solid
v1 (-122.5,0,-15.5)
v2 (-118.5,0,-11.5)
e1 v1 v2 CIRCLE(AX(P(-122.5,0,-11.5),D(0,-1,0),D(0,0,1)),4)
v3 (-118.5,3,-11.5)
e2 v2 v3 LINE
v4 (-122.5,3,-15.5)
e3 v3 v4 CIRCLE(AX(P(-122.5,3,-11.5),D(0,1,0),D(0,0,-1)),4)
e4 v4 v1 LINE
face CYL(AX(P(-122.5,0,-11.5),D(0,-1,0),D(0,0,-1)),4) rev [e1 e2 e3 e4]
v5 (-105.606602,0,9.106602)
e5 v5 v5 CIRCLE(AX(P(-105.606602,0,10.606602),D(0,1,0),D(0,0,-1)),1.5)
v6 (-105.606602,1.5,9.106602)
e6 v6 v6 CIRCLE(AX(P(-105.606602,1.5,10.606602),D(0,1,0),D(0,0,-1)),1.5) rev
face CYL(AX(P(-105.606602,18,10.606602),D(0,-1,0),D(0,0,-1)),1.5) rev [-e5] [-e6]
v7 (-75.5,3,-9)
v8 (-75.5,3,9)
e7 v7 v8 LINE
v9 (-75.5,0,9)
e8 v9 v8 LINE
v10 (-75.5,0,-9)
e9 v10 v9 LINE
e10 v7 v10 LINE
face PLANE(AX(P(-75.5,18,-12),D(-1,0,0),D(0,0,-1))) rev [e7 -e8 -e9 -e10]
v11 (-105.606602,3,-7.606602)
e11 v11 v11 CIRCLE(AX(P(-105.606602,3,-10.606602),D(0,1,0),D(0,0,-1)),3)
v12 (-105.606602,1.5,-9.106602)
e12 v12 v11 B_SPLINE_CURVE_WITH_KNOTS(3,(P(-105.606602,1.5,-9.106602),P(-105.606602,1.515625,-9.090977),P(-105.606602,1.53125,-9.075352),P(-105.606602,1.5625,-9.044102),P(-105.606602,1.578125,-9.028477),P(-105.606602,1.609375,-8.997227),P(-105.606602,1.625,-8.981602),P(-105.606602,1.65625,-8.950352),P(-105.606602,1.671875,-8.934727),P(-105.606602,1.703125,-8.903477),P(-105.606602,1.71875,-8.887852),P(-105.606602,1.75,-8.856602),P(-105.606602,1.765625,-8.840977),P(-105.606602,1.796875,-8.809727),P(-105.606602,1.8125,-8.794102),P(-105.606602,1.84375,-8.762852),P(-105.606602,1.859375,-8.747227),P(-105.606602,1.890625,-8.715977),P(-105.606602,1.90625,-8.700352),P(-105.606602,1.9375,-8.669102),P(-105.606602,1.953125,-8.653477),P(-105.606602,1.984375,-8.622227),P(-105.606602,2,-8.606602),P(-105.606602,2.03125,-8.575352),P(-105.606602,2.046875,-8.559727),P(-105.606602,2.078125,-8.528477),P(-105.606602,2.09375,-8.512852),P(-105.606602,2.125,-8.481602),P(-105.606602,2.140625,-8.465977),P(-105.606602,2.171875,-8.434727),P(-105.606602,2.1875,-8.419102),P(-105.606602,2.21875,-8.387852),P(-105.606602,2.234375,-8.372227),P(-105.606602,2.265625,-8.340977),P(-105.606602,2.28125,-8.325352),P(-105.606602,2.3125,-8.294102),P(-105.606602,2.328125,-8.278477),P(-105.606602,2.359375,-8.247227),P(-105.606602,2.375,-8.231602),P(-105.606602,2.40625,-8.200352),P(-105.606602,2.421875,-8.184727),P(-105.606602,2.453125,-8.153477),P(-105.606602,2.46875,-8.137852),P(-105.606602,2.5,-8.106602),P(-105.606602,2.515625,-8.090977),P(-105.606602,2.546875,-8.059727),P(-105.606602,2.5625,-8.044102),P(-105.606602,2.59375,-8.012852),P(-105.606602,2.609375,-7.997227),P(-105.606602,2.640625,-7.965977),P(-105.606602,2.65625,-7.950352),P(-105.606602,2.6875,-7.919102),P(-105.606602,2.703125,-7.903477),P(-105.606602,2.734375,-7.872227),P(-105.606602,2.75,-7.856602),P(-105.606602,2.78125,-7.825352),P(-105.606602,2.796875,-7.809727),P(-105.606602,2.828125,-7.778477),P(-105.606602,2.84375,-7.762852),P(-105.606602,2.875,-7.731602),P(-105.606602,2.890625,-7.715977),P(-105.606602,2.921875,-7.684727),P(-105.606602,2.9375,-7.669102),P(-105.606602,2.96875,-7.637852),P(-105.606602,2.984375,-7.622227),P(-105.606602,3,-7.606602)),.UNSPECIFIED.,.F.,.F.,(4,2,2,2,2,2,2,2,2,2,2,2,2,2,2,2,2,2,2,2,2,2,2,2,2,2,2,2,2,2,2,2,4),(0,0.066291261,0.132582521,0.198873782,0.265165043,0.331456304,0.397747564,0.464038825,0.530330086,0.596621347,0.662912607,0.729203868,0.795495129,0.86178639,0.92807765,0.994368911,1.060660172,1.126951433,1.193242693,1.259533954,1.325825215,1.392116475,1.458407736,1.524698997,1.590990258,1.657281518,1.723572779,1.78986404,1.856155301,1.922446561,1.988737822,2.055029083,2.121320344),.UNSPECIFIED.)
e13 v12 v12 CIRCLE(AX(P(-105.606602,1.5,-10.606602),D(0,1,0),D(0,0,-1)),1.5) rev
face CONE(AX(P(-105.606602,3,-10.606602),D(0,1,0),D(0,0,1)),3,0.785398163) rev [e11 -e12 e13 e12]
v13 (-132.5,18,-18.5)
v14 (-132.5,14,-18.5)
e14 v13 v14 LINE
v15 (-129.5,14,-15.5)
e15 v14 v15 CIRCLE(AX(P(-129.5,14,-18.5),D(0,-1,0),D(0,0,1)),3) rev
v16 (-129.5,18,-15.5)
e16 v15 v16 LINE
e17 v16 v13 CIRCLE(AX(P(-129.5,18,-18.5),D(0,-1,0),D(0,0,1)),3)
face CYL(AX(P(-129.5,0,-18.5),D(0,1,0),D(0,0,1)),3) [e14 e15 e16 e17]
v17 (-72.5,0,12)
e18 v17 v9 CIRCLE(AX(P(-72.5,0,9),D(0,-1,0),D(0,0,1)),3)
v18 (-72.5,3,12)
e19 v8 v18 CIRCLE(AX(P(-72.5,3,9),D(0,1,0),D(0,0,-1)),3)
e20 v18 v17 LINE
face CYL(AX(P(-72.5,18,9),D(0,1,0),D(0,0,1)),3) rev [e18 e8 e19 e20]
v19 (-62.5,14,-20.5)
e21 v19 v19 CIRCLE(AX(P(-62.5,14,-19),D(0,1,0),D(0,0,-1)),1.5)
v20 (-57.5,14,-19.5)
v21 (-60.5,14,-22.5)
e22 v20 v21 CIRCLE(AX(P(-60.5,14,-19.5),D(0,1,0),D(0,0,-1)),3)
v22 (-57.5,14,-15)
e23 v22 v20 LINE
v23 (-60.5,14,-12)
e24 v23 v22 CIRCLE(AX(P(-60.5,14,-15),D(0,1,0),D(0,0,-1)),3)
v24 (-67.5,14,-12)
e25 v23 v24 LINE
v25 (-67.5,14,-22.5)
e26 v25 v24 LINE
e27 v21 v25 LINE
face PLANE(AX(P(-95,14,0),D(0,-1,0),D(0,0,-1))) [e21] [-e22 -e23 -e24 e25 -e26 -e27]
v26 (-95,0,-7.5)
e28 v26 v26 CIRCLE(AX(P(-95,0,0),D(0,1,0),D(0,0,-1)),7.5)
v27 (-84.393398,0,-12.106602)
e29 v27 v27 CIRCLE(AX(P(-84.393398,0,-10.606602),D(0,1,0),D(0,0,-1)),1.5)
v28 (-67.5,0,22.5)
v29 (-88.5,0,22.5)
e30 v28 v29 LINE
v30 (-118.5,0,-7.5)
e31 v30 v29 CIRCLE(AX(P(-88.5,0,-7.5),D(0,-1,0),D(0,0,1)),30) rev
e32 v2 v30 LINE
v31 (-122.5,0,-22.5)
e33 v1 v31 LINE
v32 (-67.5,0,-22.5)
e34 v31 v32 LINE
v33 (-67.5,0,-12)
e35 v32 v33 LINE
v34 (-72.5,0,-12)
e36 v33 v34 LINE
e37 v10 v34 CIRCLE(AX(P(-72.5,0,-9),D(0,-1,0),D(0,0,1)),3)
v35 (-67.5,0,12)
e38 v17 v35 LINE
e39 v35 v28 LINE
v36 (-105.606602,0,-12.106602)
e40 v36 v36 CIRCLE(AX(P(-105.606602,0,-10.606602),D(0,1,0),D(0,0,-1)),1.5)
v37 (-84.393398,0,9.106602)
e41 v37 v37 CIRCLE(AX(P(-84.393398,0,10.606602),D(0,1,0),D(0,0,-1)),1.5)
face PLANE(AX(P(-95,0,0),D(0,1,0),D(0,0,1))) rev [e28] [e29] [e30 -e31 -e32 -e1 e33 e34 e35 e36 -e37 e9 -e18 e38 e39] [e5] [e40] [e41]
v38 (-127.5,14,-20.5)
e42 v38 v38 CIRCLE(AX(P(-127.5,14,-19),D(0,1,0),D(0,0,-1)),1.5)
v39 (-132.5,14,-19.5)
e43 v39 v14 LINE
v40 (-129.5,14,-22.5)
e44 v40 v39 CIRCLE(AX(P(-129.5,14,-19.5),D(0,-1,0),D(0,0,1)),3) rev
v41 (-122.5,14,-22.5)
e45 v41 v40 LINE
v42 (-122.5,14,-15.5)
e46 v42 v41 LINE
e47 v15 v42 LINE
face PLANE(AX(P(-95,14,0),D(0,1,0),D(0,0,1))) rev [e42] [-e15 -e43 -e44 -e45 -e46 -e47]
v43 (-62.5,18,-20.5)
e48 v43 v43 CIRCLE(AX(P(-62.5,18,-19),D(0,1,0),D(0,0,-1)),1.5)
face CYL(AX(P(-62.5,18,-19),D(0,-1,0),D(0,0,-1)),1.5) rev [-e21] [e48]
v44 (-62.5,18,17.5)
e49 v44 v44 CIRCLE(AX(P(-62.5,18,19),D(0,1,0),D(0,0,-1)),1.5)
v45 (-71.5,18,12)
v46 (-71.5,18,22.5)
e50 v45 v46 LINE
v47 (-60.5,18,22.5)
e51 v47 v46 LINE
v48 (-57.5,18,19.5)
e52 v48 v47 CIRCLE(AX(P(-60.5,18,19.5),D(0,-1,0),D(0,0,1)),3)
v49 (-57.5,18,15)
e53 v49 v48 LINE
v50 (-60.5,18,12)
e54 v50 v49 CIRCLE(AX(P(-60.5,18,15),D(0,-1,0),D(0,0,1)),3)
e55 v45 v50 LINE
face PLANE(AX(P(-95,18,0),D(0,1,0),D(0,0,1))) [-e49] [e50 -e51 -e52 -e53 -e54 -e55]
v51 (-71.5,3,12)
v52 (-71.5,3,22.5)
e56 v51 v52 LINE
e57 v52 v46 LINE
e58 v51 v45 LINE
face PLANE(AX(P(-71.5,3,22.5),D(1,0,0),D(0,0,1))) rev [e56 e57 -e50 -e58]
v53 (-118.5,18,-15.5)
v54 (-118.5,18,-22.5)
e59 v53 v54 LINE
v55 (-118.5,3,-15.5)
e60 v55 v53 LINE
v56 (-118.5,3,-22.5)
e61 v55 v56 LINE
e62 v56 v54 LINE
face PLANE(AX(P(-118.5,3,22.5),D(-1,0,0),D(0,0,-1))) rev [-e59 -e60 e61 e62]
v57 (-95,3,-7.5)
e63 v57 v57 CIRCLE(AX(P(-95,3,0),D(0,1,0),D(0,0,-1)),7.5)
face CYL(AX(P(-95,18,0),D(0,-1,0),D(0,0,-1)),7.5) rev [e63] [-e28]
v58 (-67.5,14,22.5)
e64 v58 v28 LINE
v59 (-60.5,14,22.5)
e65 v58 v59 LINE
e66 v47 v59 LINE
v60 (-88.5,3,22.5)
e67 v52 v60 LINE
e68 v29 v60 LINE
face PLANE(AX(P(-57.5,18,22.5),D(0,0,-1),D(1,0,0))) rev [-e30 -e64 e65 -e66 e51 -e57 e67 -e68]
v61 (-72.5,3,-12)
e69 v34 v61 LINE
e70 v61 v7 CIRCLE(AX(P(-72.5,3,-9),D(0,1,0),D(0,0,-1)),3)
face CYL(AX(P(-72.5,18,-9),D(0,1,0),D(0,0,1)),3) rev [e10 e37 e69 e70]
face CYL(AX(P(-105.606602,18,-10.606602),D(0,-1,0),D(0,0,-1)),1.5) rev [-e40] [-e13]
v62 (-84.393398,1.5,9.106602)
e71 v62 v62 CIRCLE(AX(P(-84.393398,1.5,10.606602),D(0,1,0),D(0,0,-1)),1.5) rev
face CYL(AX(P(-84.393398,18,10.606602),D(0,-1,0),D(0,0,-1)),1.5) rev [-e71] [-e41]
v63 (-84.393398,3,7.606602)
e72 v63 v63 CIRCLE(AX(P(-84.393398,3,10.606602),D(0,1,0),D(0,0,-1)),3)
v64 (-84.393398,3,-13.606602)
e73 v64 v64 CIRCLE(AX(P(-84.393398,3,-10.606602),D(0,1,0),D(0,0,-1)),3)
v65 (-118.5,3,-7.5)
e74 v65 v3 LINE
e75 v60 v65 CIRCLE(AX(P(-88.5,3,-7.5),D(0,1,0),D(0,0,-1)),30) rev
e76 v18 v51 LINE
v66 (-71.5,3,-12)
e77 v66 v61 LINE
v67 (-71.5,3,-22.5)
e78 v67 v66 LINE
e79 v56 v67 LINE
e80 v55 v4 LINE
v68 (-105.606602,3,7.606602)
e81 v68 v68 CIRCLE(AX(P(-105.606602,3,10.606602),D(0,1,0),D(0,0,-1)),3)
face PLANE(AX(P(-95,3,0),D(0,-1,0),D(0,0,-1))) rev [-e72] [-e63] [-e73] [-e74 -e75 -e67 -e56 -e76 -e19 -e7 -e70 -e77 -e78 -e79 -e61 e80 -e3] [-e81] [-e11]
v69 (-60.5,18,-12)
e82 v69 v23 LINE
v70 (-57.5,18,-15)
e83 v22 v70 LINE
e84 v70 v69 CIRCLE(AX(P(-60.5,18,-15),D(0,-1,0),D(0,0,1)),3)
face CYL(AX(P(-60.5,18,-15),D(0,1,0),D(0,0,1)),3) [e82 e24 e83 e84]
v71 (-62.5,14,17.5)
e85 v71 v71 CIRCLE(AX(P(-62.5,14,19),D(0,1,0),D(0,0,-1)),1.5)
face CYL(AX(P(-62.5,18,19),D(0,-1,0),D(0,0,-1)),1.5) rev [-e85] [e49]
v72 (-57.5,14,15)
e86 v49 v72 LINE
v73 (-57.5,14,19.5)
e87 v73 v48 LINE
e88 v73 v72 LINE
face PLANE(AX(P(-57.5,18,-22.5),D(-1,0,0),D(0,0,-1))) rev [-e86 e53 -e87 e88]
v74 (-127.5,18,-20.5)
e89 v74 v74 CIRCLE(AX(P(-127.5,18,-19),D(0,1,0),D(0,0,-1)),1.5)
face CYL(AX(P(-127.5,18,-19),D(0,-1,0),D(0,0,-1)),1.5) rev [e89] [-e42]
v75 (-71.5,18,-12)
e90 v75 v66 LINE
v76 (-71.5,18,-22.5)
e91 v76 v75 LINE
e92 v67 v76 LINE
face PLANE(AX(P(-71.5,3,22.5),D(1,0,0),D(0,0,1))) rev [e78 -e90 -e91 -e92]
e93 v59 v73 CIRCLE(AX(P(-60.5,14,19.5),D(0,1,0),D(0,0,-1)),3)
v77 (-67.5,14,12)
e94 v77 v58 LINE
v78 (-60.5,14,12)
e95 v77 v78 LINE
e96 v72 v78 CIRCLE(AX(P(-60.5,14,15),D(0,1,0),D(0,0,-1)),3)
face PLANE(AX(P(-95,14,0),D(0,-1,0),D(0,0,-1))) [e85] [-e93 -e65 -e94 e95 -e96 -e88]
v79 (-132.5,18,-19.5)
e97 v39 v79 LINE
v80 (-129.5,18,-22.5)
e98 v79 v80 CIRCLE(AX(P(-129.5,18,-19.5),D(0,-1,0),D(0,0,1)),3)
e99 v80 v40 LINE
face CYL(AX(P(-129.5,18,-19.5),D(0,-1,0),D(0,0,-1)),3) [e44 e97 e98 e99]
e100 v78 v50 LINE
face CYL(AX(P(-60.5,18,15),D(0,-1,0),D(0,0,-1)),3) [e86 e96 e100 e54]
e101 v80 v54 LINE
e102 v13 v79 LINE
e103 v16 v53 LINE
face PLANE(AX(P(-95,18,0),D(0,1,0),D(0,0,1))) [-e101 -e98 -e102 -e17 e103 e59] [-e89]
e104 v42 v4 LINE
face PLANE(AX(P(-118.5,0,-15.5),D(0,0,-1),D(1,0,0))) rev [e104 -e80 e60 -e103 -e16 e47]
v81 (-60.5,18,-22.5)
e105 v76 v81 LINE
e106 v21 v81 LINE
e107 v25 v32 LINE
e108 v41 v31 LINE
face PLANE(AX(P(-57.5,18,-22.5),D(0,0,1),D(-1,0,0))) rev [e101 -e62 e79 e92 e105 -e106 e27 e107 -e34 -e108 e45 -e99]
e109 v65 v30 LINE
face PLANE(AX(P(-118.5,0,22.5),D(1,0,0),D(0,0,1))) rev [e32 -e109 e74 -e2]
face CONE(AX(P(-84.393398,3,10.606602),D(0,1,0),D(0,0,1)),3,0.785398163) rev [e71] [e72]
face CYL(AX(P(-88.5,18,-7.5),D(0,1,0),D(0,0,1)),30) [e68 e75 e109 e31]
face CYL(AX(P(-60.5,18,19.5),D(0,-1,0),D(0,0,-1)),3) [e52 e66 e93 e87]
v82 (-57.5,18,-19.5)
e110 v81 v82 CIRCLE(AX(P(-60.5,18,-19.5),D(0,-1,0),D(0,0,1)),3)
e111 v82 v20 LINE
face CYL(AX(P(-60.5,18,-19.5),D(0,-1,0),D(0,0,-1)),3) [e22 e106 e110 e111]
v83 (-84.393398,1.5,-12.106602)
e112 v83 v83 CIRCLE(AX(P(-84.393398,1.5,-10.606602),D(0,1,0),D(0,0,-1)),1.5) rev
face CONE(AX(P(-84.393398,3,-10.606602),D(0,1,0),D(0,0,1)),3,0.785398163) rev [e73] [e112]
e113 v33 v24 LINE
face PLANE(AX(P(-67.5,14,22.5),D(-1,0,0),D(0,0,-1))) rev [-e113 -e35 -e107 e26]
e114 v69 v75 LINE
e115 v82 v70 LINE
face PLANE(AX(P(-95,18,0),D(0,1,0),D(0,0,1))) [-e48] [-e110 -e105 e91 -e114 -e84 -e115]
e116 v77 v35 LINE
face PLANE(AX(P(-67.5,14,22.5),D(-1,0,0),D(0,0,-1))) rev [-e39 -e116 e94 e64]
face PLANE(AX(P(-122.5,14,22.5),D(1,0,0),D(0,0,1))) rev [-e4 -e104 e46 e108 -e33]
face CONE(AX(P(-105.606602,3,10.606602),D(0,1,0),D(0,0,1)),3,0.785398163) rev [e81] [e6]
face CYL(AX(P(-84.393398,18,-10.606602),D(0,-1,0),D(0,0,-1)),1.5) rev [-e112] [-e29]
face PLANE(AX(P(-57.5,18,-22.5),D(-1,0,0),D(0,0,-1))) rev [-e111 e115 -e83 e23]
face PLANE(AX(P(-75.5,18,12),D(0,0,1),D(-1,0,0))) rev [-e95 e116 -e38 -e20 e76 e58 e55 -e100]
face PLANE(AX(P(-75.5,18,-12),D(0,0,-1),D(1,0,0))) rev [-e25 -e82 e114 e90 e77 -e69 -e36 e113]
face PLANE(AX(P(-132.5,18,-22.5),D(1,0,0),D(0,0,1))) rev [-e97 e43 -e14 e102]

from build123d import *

# Parameters (mm, degrees)
SKETCH_1_W          = 75
SKETCH_1_H          = 45
EXTRUDE_1_DEPTH     = 18
SKETCH_2_W          = 10
SKETCH_2_H          = 45
CUT_EXTRUDE_1_DEPTH = 14
SKETCH_3_W          = 47
SKETCH_3_H          = 45
CUT_EXTRUDE_2_DEPTH = 15
SKETCH_4_R          = 1.5
SKETCH_4_R_2        = 7.5
CUT_EXTRUDE_3_DEPTH = 48.291648311
SKETCH_5_W          = 14
SKETCH_5_H          = 38
CUT_EXTRUDE_4_DEPTH = 48.291648311
FILLET_1_R          = 30
CHAMFER_1_SIZE      = 1.5
SKETCH_8_W          = 36
SKETCH_8_H          = 24
CUT_EXTRUDE_6_DEPTH = 48.291648311
FILLET_2_R          = 3
SKETCH_9_R          = 1.5
CUT_EXTRUDE_7_DEPTH = 46.918405896
FILLET_3_R          = 3
FILLET_4_R          = 4
SKETCH_10_W         = 113.481705681
SKETCH_10_H         = 81.455057911
CUT_EXTRUDE_9_DEPTH = 136.596828871


with BuildPart() as part:
    # 草图1 → 凸台-拉伸1 (new body)
    with BuildSketch(Plane(origin=(0, 0, 0), x_dir=(1, 0, 0), z_dir=(0, 1, 0))):
        Rectangle(SKETCH_1_W, SKETCH_1_H)
    extrude(amount=EXTRUDE_1_DEPTH)

    # 草图2 → 切除-拉伸1 (cut)
    with BuildSketch(Plane.XZ):
        with Locations((-32.5, 0)):
            Rectangle(SKETCH_2_W, SKETCH_2_H)
        with Locations((32.5, 0)):
            Rectangle(SKETCH_2_W, SKETCH_2_H)
    extrude(amount=-CUT_EXTRUDE_1_DEPTH, mode=Mode.SUBTRACT)

    # 草图3 → 切除-拉伸2 (cut)
    with BuildSketch(Plane(origin=(0, 18, 0), x_dir=(1, 0, 0), z_dir=(0, 1, 0))):
        Rectangle(SKETCH_3_W, SKETCH_3_H)
    extrude(amount=-CUT_EXTRUDE_2_DEPTH, mode=Mode.SUBTRACT)

    # 草图4 → 切除-拉伸3 (cut, through all)
    with BuildSketch(Plane.XZ):
        with Locations(Location((10.606601718, 10.606601718, 0), (0, 0, 270))):
            Circle(SKETCH_4_R)
        with Locations(Location((10.606601718, -10.606601718, 0), (0, 0, 270))):
            Circle(SKETCH_4_R)
        with Locations(Location((-10.606601718, -10.606601718, 0), (0, 0, 270))):
            Circle(SKETCH_4_R)
        with Locations(Location((-10.606601718, 10.606601718, 0), (0, 0, 270))):
            Circle(SKETCH_4_R)
        with Locations(Location((0, 0, 0), (0, 0, 270))):
            Circle(SKETCH_4_R_2)
    extrude(amount=-CUT_EXTRUDE_3_DEPTH, mode=Mode.SUBTRACT)

    # 草图5 → 切除-拉伸4 (cut, through all)
    with BuildSketch(Plane(origin=(0, 18, 0), x_dir=(1, 0, 0), z_dir=(0, 1, 0))):
        with Locations((30.5, -3.5)):
            Rectangle(SKETCH_5_W, SKETCH_5_H)
    extrude(amount=-CUT_EXTRUDE_4_DEPTH, mode=Mode.SUBTRACT)

    # 圆角1
    fillet_1_edges = [part.edges().sort_by_distance(p)[0] for p in [
        (23.5, 1.5, 22.5),
    ]]
    fillet(fillet_1_edges, radius=FILLET_1_R)

    # 倒角1
    chamfer_1_edges = [part.edges().sort_by_distance(p)[0] for p in [
        (-10.606601718, 3, 12.106601718),
        (-10.606601718, 3, -9.106601718),
        (10.606601718, 3, -9.106601718),
        (10.606601718, 3, 12.106601718),
    ]]
    chamfer(chamfer_1_edges, length=CHAMFER_1_SIZE)

    # 草图8 → 切除-拉伸6 (cut, through all)
    with BuildSketch(Plane.XZ):
        with Locations((-37.5, 0)):
            Rectangle(SKETCH_8_W, SKETCH_8_H)
    extrude(amount=-CUT_EXTRUDE_6_DEPTH, mode=Mode.SUBTRACT)

    # 圆角2
    fillet_2_edges = [part.edges().sort_by_distance(p)[0] for p in [
        (-19.5, 1.5, 12),
        (-19.5, 1.5, -12),
    ]]
    fillet(fillet_2_edges, radius=FILLET_2_R)

    # 草图9 → 切除-拉伸7 (cut, through all)
    with BuildSketch(Plane.XZ.offset(-14)):
        with Locations(Location((32.5, -19, 0), (0, 0, 270))):
            Circle(SKETCH_9_R)
        with Locations(Location((-32.5, -19, 0), (0, 0, 270))):
            Circle(SKETCH_9_R)
        with Locations(Location((-32.5, 19, 0), (0, 0, 270))):
            Circle(SKETCH_9_R)
    extrude(amount=-CUT_EXTRUDE_7_DEPTH, mode=Mode.SUBTRACT)

    # 圆角3
    fillet_3_edges = [part.edges().sort_by_distance(p)[0] for p in [
        (-37.5, 16, 12),
        (-37.5, 16, -12),
        (-37.5, 16, 22.5),
        (-37.5, 16, -22.5),
        (37.5, 16, -22.5),
        (37.5, 16, -15.5),
    ]]
    fillet(fillet_3_edges, radius=FILLET_3_R)

    # 圆角4
    fillet_4_edges = [part.edges().sort_by_distance(p)[0] for p in [
        (23.5, 1.5, -15.5),
    ]]
    fillet(fillet_4_edges, radius=FILLET_4_R - 0.0001)  # a hair under: the kernel refuses the full size


with BuildPart() as body_2:
    # 镜向1: mirrored copy
    add(part.part.mirror(Plane.ZY.offset(47.5)))


with BuildPart() as part_1:
    add(part.part)

    # 草图10 → 切除-拉伸9 (cut, through all)
    with BuildSketch(Plane.XZ):
        with Locations((9.796228236, -0.64793796)):
            Rectangle(SKETCH_10_W, SKETCH_10_H)
    extrude(amount=-CUT_EXTRUDE_9_DEPTH, mode=Mode.SUBTRACT)


solid = body_2.part
